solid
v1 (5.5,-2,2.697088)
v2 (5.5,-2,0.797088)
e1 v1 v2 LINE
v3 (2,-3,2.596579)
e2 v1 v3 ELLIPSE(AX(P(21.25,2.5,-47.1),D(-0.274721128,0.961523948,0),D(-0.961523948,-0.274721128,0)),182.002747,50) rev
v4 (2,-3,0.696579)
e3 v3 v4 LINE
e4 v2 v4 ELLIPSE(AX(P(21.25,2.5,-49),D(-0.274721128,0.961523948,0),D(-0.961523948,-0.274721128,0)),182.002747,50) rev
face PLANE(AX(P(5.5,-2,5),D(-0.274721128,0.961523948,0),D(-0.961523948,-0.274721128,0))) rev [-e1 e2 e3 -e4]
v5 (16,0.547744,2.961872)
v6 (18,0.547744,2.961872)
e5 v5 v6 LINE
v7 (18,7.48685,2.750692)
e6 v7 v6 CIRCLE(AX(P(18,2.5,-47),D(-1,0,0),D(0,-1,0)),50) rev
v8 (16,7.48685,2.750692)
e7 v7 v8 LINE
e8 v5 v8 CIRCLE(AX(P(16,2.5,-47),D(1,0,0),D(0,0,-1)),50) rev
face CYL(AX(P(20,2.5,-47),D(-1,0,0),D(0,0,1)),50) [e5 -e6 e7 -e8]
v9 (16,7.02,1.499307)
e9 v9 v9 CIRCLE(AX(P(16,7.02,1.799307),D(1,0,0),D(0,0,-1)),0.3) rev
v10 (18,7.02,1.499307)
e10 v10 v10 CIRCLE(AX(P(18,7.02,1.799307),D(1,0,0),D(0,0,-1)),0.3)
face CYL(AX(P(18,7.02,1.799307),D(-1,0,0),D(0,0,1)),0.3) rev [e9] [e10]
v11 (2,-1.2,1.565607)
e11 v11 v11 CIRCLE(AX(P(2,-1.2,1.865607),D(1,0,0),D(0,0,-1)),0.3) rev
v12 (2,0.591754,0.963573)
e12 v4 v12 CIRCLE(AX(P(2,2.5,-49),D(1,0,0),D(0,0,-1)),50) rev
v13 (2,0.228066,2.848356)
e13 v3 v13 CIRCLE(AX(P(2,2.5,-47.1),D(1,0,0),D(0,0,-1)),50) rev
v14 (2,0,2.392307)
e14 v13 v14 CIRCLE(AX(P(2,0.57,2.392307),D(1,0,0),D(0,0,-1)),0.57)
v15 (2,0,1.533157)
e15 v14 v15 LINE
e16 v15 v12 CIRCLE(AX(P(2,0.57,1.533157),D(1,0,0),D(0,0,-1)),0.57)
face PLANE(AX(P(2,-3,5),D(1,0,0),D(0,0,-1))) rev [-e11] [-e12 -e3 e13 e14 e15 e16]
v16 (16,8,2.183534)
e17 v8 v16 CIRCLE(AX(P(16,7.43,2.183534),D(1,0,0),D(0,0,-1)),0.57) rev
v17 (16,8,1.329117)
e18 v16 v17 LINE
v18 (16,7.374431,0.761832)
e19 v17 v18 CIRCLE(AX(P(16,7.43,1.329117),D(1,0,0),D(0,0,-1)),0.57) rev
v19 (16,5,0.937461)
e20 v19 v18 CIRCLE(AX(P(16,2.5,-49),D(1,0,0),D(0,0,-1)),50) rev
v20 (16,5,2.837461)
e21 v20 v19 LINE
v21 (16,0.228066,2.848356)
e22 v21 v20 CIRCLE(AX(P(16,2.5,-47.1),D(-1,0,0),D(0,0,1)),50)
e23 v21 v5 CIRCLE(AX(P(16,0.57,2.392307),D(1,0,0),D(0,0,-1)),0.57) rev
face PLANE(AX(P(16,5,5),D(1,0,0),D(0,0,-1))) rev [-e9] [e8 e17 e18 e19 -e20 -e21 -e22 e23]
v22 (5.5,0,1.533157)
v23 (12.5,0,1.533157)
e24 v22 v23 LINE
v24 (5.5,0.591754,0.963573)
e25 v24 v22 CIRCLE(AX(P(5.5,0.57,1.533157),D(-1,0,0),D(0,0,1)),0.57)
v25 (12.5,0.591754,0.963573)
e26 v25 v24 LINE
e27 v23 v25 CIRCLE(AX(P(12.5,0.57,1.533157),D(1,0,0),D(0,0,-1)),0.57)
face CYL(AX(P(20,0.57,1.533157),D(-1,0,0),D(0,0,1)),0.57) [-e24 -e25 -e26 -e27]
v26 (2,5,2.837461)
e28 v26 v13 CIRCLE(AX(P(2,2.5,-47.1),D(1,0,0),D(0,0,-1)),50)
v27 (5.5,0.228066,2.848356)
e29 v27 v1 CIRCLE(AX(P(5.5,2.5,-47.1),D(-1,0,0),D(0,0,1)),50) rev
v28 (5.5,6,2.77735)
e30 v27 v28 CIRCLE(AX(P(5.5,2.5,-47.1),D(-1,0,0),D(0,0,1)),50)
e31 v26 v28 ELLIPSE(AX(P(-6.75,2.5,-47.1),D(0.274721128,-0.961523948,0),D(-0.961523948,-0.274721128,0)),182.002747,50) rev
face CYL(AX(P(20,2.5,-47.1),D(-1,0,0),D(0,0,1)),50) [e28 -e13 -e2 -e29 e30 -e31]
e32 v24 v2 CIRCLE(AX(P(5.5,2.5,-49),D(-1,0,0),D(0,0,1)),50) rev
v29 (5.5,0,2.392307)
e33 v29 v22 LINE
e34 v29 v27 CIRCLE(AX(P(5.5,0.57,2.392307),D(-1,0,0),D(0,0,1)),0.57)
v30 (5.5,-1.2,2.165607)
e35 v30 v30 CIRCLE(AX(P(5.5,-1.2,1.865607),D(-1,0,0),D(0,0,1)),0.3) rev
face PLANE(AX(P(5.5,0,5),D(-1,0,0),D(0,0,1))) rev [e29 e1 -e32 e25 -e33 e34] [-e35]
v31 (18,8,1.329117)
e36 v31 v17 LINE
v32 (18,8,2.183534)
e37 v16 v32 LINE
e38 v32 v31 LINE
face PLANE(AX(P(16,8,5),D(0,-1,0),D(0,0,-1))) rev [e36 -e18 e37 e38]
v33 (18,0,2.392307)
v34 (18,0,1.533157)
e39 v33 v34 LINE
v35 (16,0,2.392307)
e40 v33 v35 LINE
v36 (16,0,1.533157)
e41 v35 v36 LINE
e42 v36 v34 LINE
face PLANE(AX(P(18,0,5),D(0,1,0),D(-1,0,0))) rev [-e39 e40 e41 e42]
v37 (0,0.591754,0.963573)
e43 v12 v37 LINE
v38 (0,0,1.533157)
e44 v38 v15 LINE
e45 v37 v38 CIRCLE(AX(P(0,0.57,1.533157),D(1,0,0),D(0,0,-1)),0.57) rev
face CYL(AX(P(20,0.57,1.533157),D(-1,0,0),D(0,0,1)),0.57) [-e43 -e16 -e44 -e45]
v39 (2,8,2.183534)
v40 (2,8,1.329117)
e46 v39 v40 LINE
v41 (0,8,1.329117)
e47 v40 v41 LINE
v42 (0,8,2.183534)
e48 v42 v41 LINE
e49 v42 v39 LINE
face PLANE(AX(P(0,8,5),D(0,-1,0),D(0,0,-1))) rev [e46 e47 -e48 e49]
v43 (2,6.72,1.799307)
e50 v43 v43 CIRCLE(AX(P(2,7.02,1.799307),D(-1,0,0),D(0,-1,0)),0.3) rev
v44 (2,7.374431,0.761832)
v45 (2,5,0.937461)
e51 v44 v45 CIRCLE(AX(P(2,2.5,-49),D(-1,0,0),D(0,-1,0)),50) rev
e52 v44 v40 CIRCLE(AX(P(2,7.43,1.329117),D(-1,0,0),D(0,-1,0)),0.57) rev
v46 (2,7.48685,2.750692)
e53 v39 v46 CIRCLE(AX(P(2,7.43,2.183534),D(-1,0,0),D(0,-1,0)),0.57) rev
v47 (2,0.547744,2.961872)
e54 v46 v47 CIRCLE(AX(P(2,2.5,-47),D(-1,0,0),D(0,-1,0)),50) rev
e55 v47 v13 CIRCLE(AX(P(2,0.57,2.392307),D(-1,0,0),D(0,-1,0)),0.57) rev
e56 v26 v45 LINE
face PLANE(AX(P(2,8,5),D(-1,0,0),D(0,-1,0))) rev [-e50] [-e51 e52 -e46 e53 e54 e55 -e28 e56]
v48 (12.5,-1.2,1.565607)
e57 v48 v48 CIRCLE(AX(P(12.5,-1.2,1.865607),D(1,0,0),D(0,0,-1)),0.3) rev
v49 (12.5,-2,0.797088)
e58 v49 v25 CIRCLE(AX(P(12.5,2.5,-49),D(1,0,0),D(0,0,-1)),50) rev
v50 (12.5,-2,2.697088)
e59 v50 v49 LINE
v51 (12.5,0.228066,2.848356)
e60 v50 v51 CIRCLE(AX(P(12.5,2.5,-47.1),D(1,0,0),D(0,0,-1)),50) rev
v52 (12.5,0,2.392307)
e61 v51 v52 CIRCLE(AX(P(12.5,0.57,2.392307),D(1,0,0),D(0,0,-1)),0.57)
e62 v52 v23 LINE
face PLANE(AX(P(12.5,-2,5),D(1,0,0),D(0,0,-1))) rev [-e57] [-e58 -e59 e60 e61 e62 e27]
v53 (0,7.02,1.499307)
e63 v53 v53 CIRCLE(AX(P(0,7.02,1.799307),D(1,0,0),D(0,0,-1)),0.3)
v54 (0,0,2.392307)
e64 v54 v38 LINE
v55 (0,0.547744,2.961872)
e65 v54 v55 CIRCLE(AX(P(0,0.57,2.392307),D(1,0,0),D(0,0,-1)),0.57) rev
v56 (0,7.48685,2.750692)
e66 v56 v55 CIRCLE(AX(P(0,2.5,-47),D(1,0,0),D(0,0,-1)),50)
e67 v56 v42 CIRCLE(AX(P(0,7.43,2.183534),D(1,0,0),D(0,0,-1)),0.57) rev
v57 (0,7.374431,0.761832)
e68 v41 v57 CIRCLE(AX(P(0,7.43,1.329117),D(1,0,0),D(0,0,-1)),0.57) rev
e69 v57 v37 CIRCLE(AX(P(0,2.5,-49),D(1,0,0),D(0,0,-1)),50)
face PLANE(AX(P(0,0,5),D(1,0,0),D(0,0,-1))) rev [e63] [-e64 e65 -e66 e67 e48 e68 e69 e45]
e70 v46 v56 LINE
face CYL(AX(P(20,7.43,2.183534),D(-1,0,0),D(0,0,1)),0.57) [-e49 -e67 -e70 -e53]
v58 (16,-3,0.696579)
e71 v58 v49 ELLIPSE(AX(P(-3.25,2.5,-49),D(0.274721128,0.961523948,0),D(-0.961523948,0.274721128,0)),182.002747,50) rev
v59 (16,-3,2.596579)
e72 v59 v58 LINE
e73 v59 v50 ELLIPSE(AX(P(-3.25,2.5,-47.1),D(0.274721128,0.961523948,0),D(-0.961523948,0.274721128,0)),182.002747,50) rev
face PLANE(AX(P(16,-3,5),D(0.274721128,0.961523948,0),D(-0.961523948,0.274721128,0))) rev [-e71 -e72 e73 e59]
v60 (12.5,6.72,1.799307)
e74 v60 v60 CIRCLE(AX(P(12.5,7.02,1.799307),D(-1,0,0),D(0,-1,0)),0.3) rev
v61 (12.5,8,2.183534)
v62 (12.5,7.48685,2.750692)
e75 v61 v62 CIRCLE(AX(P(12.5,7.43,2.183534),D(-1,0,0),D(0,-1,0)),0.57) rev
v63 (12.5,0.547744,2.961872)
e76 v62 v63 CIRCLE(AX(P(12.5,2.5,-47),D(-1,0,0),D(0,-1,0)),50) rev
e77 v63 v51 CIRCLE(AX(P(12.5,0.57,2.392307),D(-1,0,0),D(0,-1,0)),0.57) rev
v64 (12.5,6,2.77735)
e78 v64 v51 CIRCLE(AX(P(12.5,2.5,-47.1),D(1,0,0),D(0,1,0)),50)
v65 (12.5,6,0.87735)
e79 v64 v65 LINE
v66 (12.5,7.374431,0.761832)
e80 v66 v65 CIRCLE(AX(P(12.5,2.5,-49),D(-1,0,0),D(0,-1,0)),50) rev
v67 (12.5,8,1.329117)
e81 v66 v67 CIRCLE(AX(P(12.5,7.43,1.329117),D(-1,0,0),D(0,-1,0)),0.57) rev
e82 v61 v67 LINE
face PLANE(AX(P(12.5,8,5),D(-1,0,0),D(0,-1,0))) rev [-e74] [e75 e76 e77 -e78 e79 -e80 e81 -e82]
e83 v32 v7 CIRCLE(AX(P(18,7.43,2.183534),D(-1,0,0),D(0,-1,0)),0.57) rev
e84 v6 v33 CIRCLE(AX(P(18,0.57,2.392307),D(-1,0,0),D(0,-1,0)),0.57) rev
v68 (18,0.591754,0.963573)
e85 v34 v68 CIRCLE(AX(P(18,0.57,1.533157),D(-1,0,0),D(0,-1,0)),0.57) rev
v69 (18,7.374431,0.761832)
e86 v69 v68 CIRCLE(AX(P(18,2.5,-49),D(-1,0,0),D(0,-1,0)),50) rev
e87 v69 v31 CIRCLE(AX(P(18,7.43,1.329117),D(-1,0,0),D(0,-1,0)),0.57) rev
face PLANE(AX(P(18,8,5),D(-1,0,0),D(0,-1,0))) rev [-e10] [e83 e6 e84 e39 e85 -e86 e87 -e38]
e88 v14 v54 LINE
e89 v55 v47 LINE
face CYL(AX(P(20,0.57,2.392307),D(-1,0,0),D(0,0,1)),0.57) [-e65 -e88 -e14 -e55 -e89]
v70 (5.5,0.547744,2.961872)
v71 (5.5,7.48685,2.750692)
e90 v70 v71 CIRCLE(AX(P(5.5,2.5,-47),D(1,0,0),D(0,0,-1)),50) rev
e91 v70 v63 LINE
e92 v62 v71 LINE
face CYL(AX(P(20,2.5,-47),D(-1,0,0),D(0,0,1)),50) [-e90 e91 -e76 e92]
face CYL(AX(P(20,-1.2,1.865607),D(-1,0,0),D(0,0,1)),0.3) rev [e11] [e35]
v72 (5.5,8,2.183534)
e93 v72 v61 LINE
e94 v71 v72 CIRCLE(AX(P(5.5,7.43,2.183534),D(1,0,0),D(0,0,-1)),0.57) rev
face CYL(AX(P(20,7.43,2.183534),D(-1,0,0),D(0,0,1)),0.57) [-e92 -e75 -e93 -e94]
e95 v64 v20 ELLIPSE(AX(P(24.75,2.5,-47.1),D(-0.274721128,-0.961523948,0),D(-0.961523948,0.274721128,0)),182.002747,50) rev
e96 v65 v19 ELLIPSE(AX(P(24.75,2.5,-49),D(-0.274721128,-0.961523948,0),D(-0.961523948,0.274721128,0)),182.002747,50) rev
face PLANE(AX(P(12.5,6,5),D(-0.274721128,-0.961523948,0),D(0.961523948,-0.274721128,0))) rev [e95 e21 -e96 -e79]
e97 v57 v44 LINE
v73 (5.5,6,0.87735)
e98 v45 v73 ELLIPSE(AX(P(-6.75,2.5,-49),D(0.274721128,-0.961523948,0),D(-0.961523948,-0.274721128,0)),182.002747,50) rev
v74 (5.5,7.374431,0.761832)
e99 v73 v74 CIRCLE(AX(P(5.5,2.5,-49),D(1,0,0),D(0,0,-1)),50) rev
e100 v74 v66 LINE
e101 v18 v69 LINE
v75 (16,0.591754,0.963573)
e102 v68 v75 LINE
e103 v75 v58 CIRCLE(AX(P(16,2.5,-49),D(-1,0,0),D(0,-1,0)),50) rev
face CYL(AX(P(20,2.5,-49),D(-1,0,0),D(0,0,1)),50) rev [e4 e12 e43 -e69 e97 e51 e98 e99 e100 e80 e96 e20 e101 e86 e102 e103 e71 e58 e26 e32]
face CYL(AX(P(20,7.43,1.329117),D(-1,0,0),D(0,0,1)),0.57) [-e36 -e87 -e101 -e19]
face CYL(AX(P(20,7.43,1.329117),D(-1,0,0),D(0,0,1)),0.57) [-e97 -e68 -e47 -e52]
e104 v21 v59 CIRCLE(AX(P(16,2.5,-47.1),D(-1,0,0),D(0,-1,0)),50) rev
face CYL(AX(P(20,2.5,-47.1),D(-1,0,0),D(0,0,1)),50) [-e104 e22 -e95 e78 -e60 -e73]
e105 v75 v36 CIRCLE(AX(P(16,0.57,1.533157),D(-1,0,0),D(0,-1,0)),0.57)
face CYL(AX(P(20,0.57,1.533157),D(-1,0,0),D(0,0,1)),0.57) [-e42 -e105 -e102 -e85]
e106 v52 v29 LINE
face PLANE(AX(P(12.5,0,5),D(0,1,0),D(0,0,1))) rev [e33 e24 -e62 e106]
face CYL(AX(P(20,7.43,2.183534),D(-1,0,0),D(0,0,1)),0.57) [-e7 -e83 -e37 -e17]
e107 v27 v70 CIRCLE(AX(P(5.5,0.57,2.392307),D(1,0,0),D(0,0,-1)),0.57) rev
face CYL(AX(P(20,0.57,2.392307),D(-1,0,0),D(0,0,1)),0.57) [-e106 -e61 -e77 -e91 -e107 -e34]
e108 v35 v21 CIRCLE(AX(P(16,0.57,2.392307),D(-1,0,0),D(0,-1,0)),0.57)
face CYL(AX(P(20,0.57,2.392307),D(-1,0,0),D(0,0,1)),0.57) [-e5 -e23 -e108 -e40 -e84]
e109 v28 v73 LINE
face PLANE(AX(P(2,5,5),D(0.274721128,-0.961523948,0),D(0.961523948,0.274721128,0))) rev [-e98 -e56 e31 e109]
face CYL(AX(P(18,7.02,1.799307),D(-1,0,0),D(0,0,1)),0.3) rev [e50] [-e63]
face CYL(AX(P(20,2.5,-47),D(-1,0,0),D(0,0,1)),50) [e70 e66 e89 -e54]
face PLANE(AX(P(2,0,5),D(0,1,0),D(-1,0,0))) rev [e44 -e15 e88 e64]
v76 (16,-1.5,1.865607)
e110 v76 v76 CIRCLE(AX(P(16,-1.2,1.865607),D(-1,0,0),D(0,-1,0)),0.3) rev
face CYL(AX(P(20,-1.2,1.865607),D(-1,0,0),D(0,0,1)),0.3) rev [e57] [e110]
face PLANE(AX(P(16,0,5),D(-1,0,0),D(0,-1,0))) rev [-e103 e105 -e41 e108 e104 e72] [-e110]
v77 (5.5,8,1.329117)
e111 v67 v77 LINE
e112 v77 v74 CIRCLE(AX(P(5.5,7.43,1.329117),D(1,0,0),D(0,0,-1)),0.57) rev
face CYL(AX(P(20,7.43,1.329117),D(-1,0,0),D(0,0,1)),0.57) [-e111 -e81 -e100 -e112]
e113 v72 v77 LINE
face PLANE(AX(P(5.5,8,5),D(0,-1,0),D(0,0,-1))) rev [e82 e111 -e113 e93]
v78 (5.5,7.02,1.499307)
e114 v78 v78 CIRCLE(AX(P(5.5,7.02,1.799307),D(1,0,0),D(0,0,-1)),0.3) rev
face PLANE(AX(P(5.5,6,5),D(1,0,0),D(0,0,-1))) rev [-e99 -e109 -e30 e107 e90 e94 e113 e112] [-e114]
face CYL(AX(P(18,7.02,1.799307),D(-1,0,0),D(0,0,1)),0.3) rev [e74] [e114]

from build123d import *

# Parameters (mm, degrees)
BOSS_EXTRUDE2_DEPTH = 5
SKETCH8_R           = 50
CUT_EXTRUDE6_DEPTH  = 20
SKETCH9_OUTSIDE_W   = 10.609
SKETCH9_OUTSIDE_H   = 17.306
SKETCH9_OUTSIDE_R   = 50
CUT_EXTRUDE7_DEPTH  = 20
SKETCH11_W          = 2
SKETCH11_H          = 8
SKETCH11_W_2        = 7
BOSS_EXTRUDE4_DEPTH = 2
SKETCH12_OUTSIDE_W  = 9.573
SKETCH12_OUTSIDE_H  = 17.27
SKETCH12_OUTSIDE_R  = 50
CUT_EXTRUDE8_DEPTH  = 20
SKETCH13_R          = 0.3
CUT_EXTRUDE10_DEPTH = 20.924858845
SKETCH14_R          = 0.3
CUT_EXTRUDE11_DEPTH = 20
FILLET1_R           = 0.57


with BuildPart() as part:
    # Sketch1 → Boss-Extrude2 (new body)
    with BuildSketch(Plane.XY):
        Polygon((0, 0), (0, 8), (2, 8), (2, 5), (5.5, 6), (5.5, 8), (12.5, 8), (12.5, 6), (16, 5), (16, 8), (18, 8), (18, 0), (16, 0), (16, -3), (12.5, -2), (12.5, 0), (5.5, 0), (5.5, -2), (2, -3), (2, 0), align=None)
    extrude(amount=BOSS_EXTRUDE2_DEPTH)

    # Sketch8 → Cut-Extrude6 (cut)
    with BuildSketch(Plane(origin=(0, 0, 0), x_dir=(0, 0, -1), z_dir=(1, 0, 0))):
        with Locations((49, 2.5)):
            Circle(SKETCH8_R)
    extrude(amount=CUT_EXTRUDE6_DEPTH, mode=Mode.SUBTRACT)

    # Sketch9 outside → Cut-Extrude7 (cut)
    with BuildSketch(Plane(origin=(0, 0, 0), x_dir=(0, 0, -1), z_dir=(1, 0, 0))):
        with Locations((-2.8485, 2.5)):
            Rectangle(SKETCH9_OUTSIDE_W, SKETCH9_OUTSIDE_H)
        with Locations((47.1, 2.5)):
            Circle(SKETCH9_OUTSIDE_R, mode=Mode.SUBTRACT)
    extrude(amount=CUT_EXTRUDE7_DEPTH, mode=Mode.SUBTRACT)

    # Sketch11 → Boss-Extrude4 (add)
    with BuildSketch(Plane.XY.offset(4)):
        with Locations((1, 4)):
            Rectangle(SKETCH11_W, SKETCH11_H)
        with Locations((9, 4)):
            Rectangle(SKETCH11_W_2, SKETCH11_H)
        with Locations((17, 4)):
            Rectangle(SKETCH11_W, SKETCH11_H)
    extrude(amount=-BOSS_EXTRUDE4_DEPTH)

    # Sketch12 outside → Cut-Extrude8 (cut)
    with BuildSketch(Plane(origin=(0, 0, 0), x_dir=(0, 0, -1), z_dir=(1, 0, 0))):
        with Locations((-2.3485, 2.5)):
            Rectangle(SKETCH12_OUTSIDE_W, SKETCH12_OUTSIDE_H)
        with Locations((47, 2.5)):
            Circle(SKETCH12_OUTSIDE_R, mode=Mode.SUBTRACT)
    extrude(amount=CUT_EXTRUDE8_DEPTH, mode=Mode.SUBTRACT)

    # Sketch13 → Cut-Extrude10 (cut, through all)
    with BuildSketch(Plane(origin=(0, 0, 0), x_dir=(0, 0, -1), z_dir=(1, 0, 0))):
        with Locations(Location((-1.799307082, 7.02, 0), (0, 0, 270))):
            Circle(SKETCH13_R)
    extrude(amount=CUT_EXTRUDE10_DEPTH, mode=Mode.SUBTRACT)

    # Sketch14 → Cut-Extrude11 (cut)
    with BuildSketch(Plane(origin=(0, 0, 0), x_dir=(0, 0, -1), z_dir=(1, 0, 0))):
        with Locations(Location((-1.865607241, -1.2, 0), (0, 0, 270))):
            Circle(SKETCH14_R)
    extrude(amount=CUT_EXTRUDE11_DEPTH, mode=Mode.SUBTRACT)

    # Fillet1
    # the kernel refuses this fillet: 0.57 mm, written as the material it takes off along each edge
    with BuildSketch(Plane(origin=(19.370719987, 0, 2.937460889), x_dir=(0, 0, -1), z_dir=(-1, 0, 0))) as fillet1_piece_1:
        with BuildLine():
            CenterArc((0.545153795, -0.57), FILLET1_R, 90, 87.762310927)
            ThreePointArc((-0.024411551, -0.547744285), (-0.012956585, -0.273838681), (0, 0))
            Line((0, 0), (0.545153795, 0))
        make_face()
    extrude(amount=3.370719987, mode=Mode.SUBTRACT)
    with BuildSketch(Plane(origin=(19.28998783, 8, 2.696579359), x_dir=(0, 0, -1), z_dir=(-1, 0, 0)), Plane(origin=(3.28998783, 8, 2.696579359), x_dir=(0, 0, -1), z_dir=(-1, 0, 0))) as fillet1_piece_2:
        with BuildLine():
            CenterArc((0.513045529, 0.57), FILLET1_R, 185.724026079, 84.275973921)
            ThreePointArc((-0.054112356, 0.513149909), (-0.02771814, 0.25650515), (0, 0))
            Line((0, 0), (0.513045529, 0))
        make_face()
    extrude(amount=4.57997566, mode=Mode.SUBTRACT)
    with BuildSketch(Plane(origin=(12.5, 0, 2.937460889), x_dir=(0, 0, -1), z_dir=(-1, 0, 0))) as fillet1_piece_3:
        with BuildLine():
            CenterArc((0.545153795, -0.57), FILLET1_R, 90, 87.762310927)
            ThreePointArc((-0.024411551, -0.547744285), (-0.012956585, -0.273838681), (0, 0))
            Line((0, 0), (0.545153795, 0))
        make_face()
    extrude(amount=7, mode=Mode.SUBTRACT)
    with BuildSketch(Plane(origin=(13.78998783, 8, 2.696579359), x_dir=(0, 0, -1), z_dir=(-1, 0, 0))) as fillet1_piece_4:
        with BuildLine():
            CenterArc((0.513045529, 0.57), FILLET1_R, 185.724026079, 84.275973921)
            ThreePointArc((-0.054112356, 0.513149909), (-0.02771814, 0.25650515), (0, 0))
            Line((0, 0), (0.513045529, 0))
        make_face()
    extrude(amount=9.57997566, mode=Mode.SUBTRACT)
    with BuildSketch(Plane(origin=(2, 0, 2.937460889), x_dir=(0, 0.9990083494707687, 0.0445232263845563), z_dir=(-1, 0, 0))) as fillet1_piece_5:
        with BuildLine():
            CenterArc((0.545162753, 0.569991432), FILLET1_R, 182.551836528, 87.762310927)
            Line((-0.024272006, 0.544613193), (0, 0))
            ThreePointArc((0, 0), (0.274143997, -0.000751555), (0.548287995, 0))
        make_face()
    extrude(amount=3.370719987, mode=Mode.SUBTRACT)
    with BuildSketch(Plane(origin=(2, 0, 0.937460889), x_dir=(0, 0.9990278617443559, 0.04408323330360469), z_dir=(-1, 0, 0)), Plane(origin=(19.489241357, 0, 0.937460889), x_dir=(0, 0.9990278617443559, 0.04408323330360409), z_dir=(-1, 0, 0))) as fillet1_piece_6:
        with BuildLine():
            CenterArc((0.595706111, -0.569990001), FILLET1_R, 90.339381978, 92.187220026)
            Line((0.02626023, -0.595117444), (0, 0))
            ThreePointArc((0, 0), (0.296164915, -0.000877144), (0.592329831, 0))
        make_face()
    extrude(amount=3.489241357, mode=Mode.SUBTRACT)
    with BuildSketch(Plane(origin=(3.581343655, 8, 0.696579359), x_dir=(0, 0, 1), z_dir=(-1, 0, 0))) as fillet1_piece_7:
        with BuildLine():
            CenterArc((0.632537462, -0.57), FILLET1_R, 90, 95.594572842)
            ThreePointArc((0.065252578, -0.625568519), (0.033609947, -0.312681655), (0, 0))
            Line((0, 0), (0.632537462, 0))
        make_face()
    extrude(amount=5.16268731, mode=Mode.SUBTRACT)
    with BuildSketch(Plane(origin=(14.081343655, 8, 0.696579359), x_dir=(0, -0.9946037861150897, 0.1037463669027923), z_dir=(-1, 0, 0))) as fillet1_piece_8:
        with BuildLine():
            CenterArc((0.632547622, 0.569988725), FILLET1_R, 174.045055794, 95.594572842)
            Line((0.065623464, 0.629124155), (0, 0))
            ThreePointArc((0, 0), (0.314481268, 0.000988994), (0.628962535, 0))
        make_face()
    extrude(amount=10.16268731, mode=Mode.SUBTRACT)
    with BuildSketch(Plane(origin=(19.581343655, 8, 0.696579359), x_dir=(0, -0.9946037861150897, 0.1037463669027923), z_dir=(-1, 0, 0))) as fillet1_piece_9:
        with BuildLine():
            CenterArc((0.632547622, 0.569988725), FILLET1_R, 174.045055794, 95.594572842)
            Line((0.065623464, 0.629124155), (0, 0))
            ThreePointArc((0, 0), (0.314481268, 0.000988994), (0.628962535, 0))
        make_face()
    extrude(amount=5.16268731, mode=Mode.SUBTRACT)
    with BuildSketch(Plane(origin=(12.5, 0, 0.937460889), x_dir=(0, 0.9990278617443559, 0.04408323330360469), z_dir=(-1, 0, 0))) as fillet1_piece_10:
        with BuildLine():
            CenterArc((0.595706111, -0.569990001), FILLET1_R, 90.339381978, 92.187220026)
            Line((0.02626023, -0.595117444), (0, 0))
            ThreePointArc((0, 0), (0.296164915, -0.000877144), (0.592329831, 0))
        make_face()
    extrude(amount=7, mode=Mode.SUBTRACT)


solid = part.part
